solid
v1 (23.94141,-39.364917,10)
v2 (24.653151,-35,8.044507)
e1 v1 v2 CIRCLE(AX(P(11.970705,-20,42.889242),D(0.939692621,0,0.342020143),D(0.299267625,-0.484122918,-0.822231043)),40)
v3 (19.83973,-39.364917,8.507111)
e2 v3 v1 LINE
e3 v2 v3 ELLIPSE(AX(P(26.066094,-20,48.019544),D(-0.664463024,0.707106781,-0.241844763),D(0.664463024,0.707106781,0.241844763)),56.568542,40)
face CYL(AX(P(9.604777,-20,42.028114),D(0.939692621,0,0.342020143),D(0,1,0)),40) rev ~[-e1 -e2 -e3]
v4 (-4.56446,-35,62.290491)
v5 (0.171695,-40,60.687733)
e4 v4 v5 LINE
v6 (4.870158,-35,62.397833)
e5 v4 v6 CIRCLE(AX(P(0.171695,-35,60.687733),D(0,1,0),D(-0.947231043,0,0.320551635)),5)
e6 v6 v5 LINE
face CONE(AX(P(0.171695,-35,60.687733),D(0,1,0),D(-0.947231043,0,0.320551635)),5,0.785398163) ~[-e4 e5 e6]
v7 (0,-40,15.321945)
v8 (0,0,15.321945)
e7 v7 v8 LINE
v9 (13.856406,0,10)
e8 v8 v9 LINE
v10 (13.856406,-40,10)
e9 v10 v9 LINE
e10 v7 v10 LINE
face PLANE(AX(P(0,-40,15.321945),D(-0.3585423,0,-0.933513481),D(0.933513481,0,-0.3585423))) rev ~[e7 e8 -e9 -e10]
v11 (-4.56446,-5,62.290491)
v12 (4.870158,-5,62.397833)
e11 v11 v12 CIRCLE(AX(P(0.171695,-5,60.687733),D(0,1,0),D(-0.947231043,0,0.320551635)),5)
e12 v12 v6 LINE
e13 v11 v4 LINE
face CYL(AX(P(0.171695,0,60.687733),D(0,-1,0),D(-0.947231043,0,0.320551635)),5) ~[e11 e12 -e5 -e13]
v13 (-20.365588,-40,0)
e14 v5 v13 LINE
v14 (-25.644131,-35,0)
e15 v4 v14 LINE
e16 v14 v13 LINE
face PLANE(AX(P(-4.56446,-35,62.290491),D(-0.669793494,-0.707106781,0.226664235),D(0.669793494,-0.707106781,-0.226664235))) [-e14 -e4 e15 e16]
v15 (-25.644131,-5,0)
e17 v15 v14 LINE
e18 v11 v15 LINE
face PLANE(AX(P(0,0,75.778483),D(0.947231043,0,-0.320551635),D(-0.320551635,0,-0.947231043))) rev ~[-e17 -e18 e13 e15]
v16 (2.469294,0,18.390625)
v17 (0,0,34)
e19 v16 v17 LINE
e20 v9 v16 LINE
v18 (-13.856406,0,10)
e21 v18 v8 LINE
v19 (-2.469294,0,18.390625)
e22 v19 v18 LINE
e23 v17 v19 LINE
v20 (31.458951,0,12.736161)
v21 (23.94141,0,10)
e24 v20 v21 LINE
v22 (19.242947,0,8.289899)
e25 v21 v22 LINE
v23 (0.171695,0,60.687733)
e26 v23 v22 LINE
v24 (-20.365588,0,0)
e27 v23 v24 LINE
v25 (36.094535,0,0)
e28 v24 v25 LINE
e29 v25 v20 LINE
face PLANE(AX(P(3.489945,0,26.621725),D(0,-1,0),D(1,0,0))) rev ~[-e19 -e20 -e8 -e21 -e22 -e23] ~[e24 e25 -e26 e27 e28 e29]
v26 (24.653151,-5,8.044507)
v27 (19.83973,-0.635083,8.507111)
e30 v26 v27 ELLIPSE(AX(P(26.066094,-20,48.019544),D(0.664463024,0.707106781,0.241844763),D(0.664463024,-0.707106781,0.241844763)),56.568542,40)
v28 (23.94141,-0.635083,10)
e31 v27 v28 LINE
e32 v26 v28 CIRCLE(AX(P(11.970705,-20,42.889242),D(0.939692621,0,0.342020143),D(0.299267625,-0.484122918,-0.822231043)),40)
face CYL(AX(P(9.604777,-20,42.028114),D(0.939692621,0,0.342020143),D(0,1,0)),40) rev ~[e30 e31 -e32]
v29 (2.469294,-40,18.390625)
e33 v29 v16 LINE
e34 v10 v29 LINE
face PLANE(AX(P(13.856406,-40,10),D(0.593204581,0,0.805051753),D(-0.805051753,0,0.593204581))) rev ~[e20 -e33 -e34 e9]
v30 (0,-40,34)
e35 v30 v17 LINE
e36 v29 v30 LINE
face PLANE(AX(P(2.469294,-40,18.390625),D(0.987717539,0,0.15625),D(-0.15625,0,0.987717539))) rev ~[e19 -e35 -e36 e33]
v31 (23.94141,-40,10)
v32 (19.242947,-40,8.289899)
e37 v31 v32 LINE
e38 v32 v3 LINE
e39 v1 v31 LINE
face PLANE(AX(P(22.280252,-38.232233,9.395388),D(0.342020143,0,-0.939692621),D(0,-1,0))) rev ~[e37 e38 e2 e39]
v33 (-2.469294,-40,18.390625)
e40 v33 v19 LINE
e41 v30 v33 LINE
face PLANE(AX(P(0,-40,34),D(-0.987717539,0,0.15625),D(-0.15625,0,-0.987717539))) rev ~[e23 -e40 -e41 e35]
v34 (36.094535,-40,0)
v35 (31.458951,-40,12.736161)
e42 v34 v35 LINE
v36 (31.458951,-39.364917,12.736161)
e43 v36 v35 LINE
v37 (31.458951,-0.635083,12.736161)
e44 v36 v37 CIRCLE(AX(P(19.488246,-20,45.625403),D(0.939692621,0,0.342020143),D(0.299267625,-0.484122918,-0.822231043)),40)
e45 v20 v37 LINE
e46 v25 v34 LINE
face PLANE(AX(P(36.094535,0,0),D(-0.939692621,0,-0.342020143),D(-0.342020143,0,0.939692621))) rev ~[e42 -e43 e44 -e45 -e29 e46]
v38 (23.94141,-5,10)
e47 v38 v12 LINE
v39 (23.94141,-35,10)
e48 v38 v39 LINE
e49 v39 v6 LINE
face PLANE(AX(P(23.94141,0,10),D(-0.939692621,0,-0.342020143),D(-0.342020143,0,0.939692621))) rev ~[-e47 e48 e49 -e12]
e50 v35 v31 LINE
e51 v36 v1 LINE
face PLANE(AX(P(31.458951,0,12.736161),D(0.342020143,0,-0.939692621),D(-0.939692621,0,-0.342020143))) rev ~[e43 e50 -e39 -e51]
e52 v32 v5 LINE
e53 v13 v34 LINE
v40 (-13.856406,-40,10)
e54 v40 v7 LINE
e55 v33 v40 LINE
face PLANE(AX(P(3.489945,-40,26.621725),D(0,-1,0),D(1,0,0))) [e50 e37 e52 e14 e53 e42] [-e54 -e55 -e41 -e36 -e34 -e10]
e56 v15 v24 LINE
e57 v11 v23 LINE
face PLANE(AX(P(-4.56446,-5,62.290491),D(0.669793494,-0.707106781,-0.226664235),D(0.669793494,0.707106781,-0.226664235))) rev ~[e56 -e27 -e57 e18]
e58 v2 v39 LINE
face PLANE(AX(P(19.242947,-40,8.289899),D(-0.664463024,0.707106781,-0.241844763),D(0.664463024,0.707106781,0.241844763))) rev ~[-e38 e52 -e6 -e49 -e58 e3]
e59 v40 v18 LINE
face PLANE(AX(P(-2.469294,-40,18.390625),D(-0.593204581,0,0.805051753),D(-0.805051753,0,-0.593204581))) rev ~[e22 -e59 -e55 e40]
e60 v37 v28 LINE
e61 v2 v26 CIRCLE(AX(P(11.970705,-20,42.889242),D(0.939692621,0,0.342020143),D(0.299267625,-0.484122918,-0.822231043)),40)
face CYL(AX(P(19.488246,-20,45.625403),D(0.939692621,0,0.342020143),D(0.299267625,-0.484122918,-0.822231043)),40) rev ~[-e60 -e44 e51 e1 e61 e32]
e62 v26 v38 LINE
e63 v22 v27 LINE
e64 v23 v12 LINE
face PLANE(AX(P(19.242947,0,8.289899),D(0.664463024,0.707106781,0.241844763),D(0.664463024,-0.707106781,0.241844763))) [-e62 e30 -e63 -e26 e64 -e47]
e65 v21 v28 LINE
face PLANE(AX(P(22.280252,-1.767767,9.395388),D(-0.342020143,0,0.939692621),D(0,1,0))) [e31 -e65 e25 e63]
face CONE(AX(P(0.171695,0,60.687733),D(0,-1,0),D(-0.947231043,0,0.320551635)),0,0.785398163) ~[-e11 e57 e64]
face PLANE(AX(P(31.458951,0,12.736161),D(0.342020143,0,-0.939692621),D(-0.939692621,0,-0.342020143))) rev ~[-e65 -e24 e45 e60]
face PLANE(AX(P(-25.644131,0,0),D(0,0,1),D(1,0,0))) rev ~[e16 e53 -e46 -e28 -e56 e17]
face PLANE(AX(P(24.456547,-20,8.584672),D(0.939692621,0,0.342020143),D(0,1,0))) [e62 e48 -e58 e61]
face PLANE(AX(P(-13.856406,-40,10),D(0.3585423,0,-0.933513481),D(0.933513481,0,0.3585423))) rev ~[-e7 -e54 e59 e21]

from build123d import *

# Parameters (mm, degrees)
F1_DEPTH     = 40
F4_DEPTH     = 8
F5_R         = 5
F6_T1_DEPTH  = 78.6190243925
F6_T4_ANGLE  = 141.3037112845
F6_T8_DEPTH  = 68.6190243925
F6_S9_R      = 40
F6_T10_DEPTH = 38
F6_T15_DEPTH = 55.7606094527
F6_S16_R     = 40
F6_T17_DEPTH = 31
F6_T21_DEPTH = 55.7606094527
F6_S22_R     = 40
F6_T23_DEPTH = 31
F6_T25_ANGLE = 141.3037112845
F6_T29_DEPTH = 68.6190243925
F6_S31_R     = 40
F6_T32_DEPTH = 38
F6_T36_DEPTH = 55.7606094527
F6_S37_R     = 40
F6_T38_DEPTH = 31
F6_T42_DEPTH = 55.7606094527
F6_S43_R     = 40
F6_T44_DEPTH = 31
F8_DEPTH     = 40


# Not quite as in the source:
# - a fillet or chamfer that OpenCascade refuses, or shapes differently, is made with other operations: its cross-section is extruded or revolved along the edge and cut away or added


with BuildPart() as f1:
    # F0 (on Front) → F1 (new body)
    with BuildSketch(Plane.XZ):
        Polygon((-25.644130815, 0), (0, 0), (36.0945345553, 0), (31.4589509991, 12.7361611466), (23.9414100328, 10), (0, 75.778483455), align=None)
    extrude(amount=F1_DEPTH)

    # F3 (on face) → F4 (cut, through all)
    with BuildSketch(Plane(origin=(31.8722760891, 0, 11.6005597948), x_dir=(0, 1, 0), z_dir=(0.9396926208, 0, 0.3420201433))):
        with BuildLine():
            Line((-0.635083269, 1.208481717), (-39.364916731, 1.208481717))
            ThreePointArc((-39.364916731, 1.208481717), (-20, -3.791518283), (-0.635083269, 1.208481717))
        make_face()
    extrude(amount=-F4_DEPTH, mode=Mode.SUBTRACT)

    # F5
    f5_edges = [f1.edges().sort_by_distance(p)[0] for p in [
        (0, -20, 75.778483),
    ]]
    fillet(f5_edges, radius=F5_R)

    # F6: chamfer of 5 on 2 edges, made by hand

    # F6_s2 → F6_t1 (cut)
    with BuildSketch(Plane(origin=(18.4446505209, 0, 54.5039975974), x_dir=(0, 1, 0), z_dir=(-0.3205516352, 0, -0.9472310432))):
        Polygon((-35, -24.2909167836), (-40, -19.2909167836), (-40, -24.2909167836), align=None)
        Polygon((-5, -24.2909167836), (0, -19.2909167836), (0, -24.2909167836), align=None)
    extrude(amount=F6_T1_DEPTH, mode=Mode.SUBTRACT)

    # F6_s3 → F6_t4 (revolve, cut)
    with BuildSketch(Plane(origin=(18.4446505209, 0, 54.5039975974), x_dir=(0, 1, 0), z_dir=(-0.3205516352, 0, -0.9472310432))):
        Polygon((0, -19.2909167836), (-5, -24.2909167836), (0, -24.2909167836), align=None)
    revolve(axis=Axis((0.1716952919, 0, 60.6877325166), (0, 1, 0)), revolution_arc=F6_T4_ANGLE, mode=Mode.SUBTRACT)


with BuildPart() as f6_tool6:
    # F6_s7 → F6_t8 (new body)
    with BuildSketch(Plane(origin=(3.9845118306, 0, -10.9473562821), x_dir=(0, 1, 0), z_dir=(-0.3420201433, 0, 0.9396926208))):
        Polygon((0, -20.9177677723), (-5, -25.9177677723), (0, -25.9177677723), align=None)
    extrude(amount=F6_T8_DEPTH)

    # F6_s9 → F6_t10 (intersect, symmetric)
    with BuildSketch(Plane(origin=(21.9888073264, 0, 8.0032713538), x_dir=(0, 1, 0), z_dir=(0.9396926208, 0, 0.3420201433))):
        with Locations((-20, 36.208481717)):
            Circle(F6_S9_R)
    extrude(amount=F6_T10_DEPTH, both=True, mode=Mode.INTERSECT)

    split(bisect_by=Plane(origin=(-0.4133250901, 0, 1.1356013518), x_dir=(0, 1, 0), z_dir=(0.3420201433, 0, -0.9396926208)), keep=Keep.TOP)


with BuildPart() as f1_1:
    add(f1.part)

    # F6_t5: cut F6_tool6
    add(f6_tool6.part, mode=Mode.SUBTRACT)


with BuildPart() as f6_tool13:
    # F6_s14 → F6_t15 (new body)
    with BuildSketch(Plane(origin=(-0.4133250901, 0, 1.1356013518), x_dir=(0, 1, 0), z_dir=(-0.3420201433, 0, 0.9396926208))):
        Polygon((0, -20.9177677723), (-5, -25.9177677723), (0, -25.9177677723), align=None)
    extrude(amount=F6_T15_DEPTH)

    # F6_s16 → F6_t17 (cut, symmetric)
    with BuildSketch(Plane(origin=(21.9888073264, 0, 8.0032713538), x_dir=(0, 1, 0), z_dir=(0.9396926208, 0, 0.3420201433))):
        with Locations((-20, 36.208481717)):
            Circle(F6_S16_R)
    extrude(amount=F6_T17_DEPTH, both=True, mode=Mode.SUBTRACT)


with BuildPart() as f1_2:
    add(f1_1.part)

    # F6_t12: cut F6_tool13
    add(f6_tool13.part, mode=Mode.SUBTRACT)


with BuildPart() as f6_tool19:
    # F6_s20 → F6_t21 (new body)
    with BuildSketch(Plane(origin=(-0.4133250901, 0, 1.1356013518), x_dir=(0, 1, 0), z_dir=(-0.3420201433, 0, 0.9396926208))):
        Polygon((0, -20.9177677723), (-5, -25.9177677723), (0, -25.9177677723), align=None)
    extrude(amount=F6_T21_DEPTH)

    # F6_s22 → F6_t23 (intersect, symmetric)
    with BuildSketch(Plane(origin=(21.9888073264, 0, 8.0032713538), x_dir=(0, 1, 0), z_dir=(0.9396926208, 0, 0.3420201433))):
        with Locations((-20, 36.208481717)):
            Circle(F6_S22_R)
    extrude(amount=F6_T23_DEPTH, both=True, mode=Mode.INTERSECT)


with BuildPart() as f1_3:
    add(f1_2.part)

    # F6_t18: cut F6_tool19
    add(f6_tool19.part, mode=Mode.SUBTRACT)

    # F6_s24 → F6_t25 (revolve, cut)
    with BuildSketch(Plane(origin=(18.4446505209, 0, 54.5039975974), x_dir=(0, 1, 0), z_dir=(-0.3205516352, 0, -0.9472310432))):
        Polygon((-35, -24.2909167836), (-40, -19.2909167836), (-40, -24.2909167836), align=None)
    revolve(axis=Axis((0.1716952919, -40, 60.6877325166), (0, 1, 0)), revolution_arc=F6_T25_ANGLE, mode=Mode.SUBTRACT)


with BuildPart() as f6_tool27:
    # F6_s28 → F6_t29 (new body)
    with BuildSketch(Plane(origin=(3.9845118306, 0, -10.9473562821), x_dir=(0, 1, 0), z_dir=(-0.3420201433, 0, 0.9396926208))):
        Polygon((-40, -20.9177677723), (-35, -25.9177677723), (-40, -25.9177677723), align=None)
    extrude(amount=F6_T29_DEPTH)

    split(bisect_by=Plane(origin=(-0.4133250901, 0, 1.1356013518), x_dir=(0, 1, 0), z_dir=(0.3420201433, 0, -0.9396926208)), keep=Keep.TOP)

    # F6_s31 → F6_t32 (intersect, symmetric)
    with BuildSketch(Plane(origin=(21.9888073264, 0, 8.0032713538), x_dir=(0, 1, 0), z_dir=(0.9396926208, 0, 0.3420201433))):
        with Locations((-20, 36.208481717)):
            Circle(F6_S31_R)
    extrude(amount=F6_T32_DEPTH, both=True, mode=Mode.INTERSECT)


with BuildPart() as f1_4:
    add(f1_3.part)

    # F6_t26: cut F6_tool27
    add(f6_tool27.part, mode=Mode.SUBTRACT)


with BuildPart() as f6_tool34:
    # F6_s35 → F6_t36 (new body)
    with BuildSketch(Plane(origin=(-0.4133250901, 0, 1.1356013518), x_dir=(0, 1, 0), z_dir=(-0.3420201433, 0, 0.9396926208))):
        Polygon((-40, -20.9177677723), (-35, -25.9177677723), (-40, -25.9177677723), align=None)
    extrude(amount=F6_T36_DEPTH)

    # F6_s37 → F6_t38 (cut, symmetric)
    with BuildSketch(Plane(origin=(21.9888073264, 0, 8.0032713538), x_dir=(0, 1, 0), z_dir=(0.9396926208, 0, 0.3420201433))):
        with Locations((-20, 36.208481717)):
            Circle(F6_S37_R)
    extrude(amount=F6_T38_DEPTH, both=True, mode=Mode.SUBTRACT)


with BuildPart() as f1_5:
    add(f1_4.part)

    # F6_t33: cut F6_tool34
    add(f6_tool34.part, mode=Mode.SUBTRACT)


with BuildPart() as f6_tool40:
    # F6_s41 → F6_t42 (new body)
    with BuildSketch(Plane(origin=(-0.4133250901, 0, 1.1356013518), x_dir=(0, 1, 0), z_dir=(-0.3420201433, 0, 0.9396926208))):
        Polygon((-40, -20.9177677723), (-35, -25.9177677723), (-40, -25.9177677723), align=None)
    extrude(amount=F6_T42_DEPTH)

    # F6_s43 → F6_t44 (intersect, symmetric)
    with BuildSketch(Plane(origin=(21.9888073264, 0, 8.0032713538), x_dir=(0, 1, 0), z_dir=(0.9396926208, 0, 0.3420201433))):
        with Locations((-20, 36.208481717)):
            Circle(F6_S43_R)
    extrude(amount=F6_T44_DEPTH, both=True, mode=Mode.INTERSECT)


with BuildPart() as f1_6:
    add(f1_5.part)

    # F6_t39: cut F6_tool40
    add(f6_tool40.part, mode=Mode.SUBTRACT)

    # F7 (on face) → F8 (cut, through all)
    with BuildSketch(Plane.XZ.offset(40)):
        Polygon((2.4692938483, 18.390625), (0, 34), (-2.4692938483, 18.390625), (-13.8564064606, 10), (0, 15.3219454766), (13.8564064606, 10), align=None)
    extrude(amount=-F8_DEPTH, mode=Mode.SUBTRACT)


solid = f1_6.part
